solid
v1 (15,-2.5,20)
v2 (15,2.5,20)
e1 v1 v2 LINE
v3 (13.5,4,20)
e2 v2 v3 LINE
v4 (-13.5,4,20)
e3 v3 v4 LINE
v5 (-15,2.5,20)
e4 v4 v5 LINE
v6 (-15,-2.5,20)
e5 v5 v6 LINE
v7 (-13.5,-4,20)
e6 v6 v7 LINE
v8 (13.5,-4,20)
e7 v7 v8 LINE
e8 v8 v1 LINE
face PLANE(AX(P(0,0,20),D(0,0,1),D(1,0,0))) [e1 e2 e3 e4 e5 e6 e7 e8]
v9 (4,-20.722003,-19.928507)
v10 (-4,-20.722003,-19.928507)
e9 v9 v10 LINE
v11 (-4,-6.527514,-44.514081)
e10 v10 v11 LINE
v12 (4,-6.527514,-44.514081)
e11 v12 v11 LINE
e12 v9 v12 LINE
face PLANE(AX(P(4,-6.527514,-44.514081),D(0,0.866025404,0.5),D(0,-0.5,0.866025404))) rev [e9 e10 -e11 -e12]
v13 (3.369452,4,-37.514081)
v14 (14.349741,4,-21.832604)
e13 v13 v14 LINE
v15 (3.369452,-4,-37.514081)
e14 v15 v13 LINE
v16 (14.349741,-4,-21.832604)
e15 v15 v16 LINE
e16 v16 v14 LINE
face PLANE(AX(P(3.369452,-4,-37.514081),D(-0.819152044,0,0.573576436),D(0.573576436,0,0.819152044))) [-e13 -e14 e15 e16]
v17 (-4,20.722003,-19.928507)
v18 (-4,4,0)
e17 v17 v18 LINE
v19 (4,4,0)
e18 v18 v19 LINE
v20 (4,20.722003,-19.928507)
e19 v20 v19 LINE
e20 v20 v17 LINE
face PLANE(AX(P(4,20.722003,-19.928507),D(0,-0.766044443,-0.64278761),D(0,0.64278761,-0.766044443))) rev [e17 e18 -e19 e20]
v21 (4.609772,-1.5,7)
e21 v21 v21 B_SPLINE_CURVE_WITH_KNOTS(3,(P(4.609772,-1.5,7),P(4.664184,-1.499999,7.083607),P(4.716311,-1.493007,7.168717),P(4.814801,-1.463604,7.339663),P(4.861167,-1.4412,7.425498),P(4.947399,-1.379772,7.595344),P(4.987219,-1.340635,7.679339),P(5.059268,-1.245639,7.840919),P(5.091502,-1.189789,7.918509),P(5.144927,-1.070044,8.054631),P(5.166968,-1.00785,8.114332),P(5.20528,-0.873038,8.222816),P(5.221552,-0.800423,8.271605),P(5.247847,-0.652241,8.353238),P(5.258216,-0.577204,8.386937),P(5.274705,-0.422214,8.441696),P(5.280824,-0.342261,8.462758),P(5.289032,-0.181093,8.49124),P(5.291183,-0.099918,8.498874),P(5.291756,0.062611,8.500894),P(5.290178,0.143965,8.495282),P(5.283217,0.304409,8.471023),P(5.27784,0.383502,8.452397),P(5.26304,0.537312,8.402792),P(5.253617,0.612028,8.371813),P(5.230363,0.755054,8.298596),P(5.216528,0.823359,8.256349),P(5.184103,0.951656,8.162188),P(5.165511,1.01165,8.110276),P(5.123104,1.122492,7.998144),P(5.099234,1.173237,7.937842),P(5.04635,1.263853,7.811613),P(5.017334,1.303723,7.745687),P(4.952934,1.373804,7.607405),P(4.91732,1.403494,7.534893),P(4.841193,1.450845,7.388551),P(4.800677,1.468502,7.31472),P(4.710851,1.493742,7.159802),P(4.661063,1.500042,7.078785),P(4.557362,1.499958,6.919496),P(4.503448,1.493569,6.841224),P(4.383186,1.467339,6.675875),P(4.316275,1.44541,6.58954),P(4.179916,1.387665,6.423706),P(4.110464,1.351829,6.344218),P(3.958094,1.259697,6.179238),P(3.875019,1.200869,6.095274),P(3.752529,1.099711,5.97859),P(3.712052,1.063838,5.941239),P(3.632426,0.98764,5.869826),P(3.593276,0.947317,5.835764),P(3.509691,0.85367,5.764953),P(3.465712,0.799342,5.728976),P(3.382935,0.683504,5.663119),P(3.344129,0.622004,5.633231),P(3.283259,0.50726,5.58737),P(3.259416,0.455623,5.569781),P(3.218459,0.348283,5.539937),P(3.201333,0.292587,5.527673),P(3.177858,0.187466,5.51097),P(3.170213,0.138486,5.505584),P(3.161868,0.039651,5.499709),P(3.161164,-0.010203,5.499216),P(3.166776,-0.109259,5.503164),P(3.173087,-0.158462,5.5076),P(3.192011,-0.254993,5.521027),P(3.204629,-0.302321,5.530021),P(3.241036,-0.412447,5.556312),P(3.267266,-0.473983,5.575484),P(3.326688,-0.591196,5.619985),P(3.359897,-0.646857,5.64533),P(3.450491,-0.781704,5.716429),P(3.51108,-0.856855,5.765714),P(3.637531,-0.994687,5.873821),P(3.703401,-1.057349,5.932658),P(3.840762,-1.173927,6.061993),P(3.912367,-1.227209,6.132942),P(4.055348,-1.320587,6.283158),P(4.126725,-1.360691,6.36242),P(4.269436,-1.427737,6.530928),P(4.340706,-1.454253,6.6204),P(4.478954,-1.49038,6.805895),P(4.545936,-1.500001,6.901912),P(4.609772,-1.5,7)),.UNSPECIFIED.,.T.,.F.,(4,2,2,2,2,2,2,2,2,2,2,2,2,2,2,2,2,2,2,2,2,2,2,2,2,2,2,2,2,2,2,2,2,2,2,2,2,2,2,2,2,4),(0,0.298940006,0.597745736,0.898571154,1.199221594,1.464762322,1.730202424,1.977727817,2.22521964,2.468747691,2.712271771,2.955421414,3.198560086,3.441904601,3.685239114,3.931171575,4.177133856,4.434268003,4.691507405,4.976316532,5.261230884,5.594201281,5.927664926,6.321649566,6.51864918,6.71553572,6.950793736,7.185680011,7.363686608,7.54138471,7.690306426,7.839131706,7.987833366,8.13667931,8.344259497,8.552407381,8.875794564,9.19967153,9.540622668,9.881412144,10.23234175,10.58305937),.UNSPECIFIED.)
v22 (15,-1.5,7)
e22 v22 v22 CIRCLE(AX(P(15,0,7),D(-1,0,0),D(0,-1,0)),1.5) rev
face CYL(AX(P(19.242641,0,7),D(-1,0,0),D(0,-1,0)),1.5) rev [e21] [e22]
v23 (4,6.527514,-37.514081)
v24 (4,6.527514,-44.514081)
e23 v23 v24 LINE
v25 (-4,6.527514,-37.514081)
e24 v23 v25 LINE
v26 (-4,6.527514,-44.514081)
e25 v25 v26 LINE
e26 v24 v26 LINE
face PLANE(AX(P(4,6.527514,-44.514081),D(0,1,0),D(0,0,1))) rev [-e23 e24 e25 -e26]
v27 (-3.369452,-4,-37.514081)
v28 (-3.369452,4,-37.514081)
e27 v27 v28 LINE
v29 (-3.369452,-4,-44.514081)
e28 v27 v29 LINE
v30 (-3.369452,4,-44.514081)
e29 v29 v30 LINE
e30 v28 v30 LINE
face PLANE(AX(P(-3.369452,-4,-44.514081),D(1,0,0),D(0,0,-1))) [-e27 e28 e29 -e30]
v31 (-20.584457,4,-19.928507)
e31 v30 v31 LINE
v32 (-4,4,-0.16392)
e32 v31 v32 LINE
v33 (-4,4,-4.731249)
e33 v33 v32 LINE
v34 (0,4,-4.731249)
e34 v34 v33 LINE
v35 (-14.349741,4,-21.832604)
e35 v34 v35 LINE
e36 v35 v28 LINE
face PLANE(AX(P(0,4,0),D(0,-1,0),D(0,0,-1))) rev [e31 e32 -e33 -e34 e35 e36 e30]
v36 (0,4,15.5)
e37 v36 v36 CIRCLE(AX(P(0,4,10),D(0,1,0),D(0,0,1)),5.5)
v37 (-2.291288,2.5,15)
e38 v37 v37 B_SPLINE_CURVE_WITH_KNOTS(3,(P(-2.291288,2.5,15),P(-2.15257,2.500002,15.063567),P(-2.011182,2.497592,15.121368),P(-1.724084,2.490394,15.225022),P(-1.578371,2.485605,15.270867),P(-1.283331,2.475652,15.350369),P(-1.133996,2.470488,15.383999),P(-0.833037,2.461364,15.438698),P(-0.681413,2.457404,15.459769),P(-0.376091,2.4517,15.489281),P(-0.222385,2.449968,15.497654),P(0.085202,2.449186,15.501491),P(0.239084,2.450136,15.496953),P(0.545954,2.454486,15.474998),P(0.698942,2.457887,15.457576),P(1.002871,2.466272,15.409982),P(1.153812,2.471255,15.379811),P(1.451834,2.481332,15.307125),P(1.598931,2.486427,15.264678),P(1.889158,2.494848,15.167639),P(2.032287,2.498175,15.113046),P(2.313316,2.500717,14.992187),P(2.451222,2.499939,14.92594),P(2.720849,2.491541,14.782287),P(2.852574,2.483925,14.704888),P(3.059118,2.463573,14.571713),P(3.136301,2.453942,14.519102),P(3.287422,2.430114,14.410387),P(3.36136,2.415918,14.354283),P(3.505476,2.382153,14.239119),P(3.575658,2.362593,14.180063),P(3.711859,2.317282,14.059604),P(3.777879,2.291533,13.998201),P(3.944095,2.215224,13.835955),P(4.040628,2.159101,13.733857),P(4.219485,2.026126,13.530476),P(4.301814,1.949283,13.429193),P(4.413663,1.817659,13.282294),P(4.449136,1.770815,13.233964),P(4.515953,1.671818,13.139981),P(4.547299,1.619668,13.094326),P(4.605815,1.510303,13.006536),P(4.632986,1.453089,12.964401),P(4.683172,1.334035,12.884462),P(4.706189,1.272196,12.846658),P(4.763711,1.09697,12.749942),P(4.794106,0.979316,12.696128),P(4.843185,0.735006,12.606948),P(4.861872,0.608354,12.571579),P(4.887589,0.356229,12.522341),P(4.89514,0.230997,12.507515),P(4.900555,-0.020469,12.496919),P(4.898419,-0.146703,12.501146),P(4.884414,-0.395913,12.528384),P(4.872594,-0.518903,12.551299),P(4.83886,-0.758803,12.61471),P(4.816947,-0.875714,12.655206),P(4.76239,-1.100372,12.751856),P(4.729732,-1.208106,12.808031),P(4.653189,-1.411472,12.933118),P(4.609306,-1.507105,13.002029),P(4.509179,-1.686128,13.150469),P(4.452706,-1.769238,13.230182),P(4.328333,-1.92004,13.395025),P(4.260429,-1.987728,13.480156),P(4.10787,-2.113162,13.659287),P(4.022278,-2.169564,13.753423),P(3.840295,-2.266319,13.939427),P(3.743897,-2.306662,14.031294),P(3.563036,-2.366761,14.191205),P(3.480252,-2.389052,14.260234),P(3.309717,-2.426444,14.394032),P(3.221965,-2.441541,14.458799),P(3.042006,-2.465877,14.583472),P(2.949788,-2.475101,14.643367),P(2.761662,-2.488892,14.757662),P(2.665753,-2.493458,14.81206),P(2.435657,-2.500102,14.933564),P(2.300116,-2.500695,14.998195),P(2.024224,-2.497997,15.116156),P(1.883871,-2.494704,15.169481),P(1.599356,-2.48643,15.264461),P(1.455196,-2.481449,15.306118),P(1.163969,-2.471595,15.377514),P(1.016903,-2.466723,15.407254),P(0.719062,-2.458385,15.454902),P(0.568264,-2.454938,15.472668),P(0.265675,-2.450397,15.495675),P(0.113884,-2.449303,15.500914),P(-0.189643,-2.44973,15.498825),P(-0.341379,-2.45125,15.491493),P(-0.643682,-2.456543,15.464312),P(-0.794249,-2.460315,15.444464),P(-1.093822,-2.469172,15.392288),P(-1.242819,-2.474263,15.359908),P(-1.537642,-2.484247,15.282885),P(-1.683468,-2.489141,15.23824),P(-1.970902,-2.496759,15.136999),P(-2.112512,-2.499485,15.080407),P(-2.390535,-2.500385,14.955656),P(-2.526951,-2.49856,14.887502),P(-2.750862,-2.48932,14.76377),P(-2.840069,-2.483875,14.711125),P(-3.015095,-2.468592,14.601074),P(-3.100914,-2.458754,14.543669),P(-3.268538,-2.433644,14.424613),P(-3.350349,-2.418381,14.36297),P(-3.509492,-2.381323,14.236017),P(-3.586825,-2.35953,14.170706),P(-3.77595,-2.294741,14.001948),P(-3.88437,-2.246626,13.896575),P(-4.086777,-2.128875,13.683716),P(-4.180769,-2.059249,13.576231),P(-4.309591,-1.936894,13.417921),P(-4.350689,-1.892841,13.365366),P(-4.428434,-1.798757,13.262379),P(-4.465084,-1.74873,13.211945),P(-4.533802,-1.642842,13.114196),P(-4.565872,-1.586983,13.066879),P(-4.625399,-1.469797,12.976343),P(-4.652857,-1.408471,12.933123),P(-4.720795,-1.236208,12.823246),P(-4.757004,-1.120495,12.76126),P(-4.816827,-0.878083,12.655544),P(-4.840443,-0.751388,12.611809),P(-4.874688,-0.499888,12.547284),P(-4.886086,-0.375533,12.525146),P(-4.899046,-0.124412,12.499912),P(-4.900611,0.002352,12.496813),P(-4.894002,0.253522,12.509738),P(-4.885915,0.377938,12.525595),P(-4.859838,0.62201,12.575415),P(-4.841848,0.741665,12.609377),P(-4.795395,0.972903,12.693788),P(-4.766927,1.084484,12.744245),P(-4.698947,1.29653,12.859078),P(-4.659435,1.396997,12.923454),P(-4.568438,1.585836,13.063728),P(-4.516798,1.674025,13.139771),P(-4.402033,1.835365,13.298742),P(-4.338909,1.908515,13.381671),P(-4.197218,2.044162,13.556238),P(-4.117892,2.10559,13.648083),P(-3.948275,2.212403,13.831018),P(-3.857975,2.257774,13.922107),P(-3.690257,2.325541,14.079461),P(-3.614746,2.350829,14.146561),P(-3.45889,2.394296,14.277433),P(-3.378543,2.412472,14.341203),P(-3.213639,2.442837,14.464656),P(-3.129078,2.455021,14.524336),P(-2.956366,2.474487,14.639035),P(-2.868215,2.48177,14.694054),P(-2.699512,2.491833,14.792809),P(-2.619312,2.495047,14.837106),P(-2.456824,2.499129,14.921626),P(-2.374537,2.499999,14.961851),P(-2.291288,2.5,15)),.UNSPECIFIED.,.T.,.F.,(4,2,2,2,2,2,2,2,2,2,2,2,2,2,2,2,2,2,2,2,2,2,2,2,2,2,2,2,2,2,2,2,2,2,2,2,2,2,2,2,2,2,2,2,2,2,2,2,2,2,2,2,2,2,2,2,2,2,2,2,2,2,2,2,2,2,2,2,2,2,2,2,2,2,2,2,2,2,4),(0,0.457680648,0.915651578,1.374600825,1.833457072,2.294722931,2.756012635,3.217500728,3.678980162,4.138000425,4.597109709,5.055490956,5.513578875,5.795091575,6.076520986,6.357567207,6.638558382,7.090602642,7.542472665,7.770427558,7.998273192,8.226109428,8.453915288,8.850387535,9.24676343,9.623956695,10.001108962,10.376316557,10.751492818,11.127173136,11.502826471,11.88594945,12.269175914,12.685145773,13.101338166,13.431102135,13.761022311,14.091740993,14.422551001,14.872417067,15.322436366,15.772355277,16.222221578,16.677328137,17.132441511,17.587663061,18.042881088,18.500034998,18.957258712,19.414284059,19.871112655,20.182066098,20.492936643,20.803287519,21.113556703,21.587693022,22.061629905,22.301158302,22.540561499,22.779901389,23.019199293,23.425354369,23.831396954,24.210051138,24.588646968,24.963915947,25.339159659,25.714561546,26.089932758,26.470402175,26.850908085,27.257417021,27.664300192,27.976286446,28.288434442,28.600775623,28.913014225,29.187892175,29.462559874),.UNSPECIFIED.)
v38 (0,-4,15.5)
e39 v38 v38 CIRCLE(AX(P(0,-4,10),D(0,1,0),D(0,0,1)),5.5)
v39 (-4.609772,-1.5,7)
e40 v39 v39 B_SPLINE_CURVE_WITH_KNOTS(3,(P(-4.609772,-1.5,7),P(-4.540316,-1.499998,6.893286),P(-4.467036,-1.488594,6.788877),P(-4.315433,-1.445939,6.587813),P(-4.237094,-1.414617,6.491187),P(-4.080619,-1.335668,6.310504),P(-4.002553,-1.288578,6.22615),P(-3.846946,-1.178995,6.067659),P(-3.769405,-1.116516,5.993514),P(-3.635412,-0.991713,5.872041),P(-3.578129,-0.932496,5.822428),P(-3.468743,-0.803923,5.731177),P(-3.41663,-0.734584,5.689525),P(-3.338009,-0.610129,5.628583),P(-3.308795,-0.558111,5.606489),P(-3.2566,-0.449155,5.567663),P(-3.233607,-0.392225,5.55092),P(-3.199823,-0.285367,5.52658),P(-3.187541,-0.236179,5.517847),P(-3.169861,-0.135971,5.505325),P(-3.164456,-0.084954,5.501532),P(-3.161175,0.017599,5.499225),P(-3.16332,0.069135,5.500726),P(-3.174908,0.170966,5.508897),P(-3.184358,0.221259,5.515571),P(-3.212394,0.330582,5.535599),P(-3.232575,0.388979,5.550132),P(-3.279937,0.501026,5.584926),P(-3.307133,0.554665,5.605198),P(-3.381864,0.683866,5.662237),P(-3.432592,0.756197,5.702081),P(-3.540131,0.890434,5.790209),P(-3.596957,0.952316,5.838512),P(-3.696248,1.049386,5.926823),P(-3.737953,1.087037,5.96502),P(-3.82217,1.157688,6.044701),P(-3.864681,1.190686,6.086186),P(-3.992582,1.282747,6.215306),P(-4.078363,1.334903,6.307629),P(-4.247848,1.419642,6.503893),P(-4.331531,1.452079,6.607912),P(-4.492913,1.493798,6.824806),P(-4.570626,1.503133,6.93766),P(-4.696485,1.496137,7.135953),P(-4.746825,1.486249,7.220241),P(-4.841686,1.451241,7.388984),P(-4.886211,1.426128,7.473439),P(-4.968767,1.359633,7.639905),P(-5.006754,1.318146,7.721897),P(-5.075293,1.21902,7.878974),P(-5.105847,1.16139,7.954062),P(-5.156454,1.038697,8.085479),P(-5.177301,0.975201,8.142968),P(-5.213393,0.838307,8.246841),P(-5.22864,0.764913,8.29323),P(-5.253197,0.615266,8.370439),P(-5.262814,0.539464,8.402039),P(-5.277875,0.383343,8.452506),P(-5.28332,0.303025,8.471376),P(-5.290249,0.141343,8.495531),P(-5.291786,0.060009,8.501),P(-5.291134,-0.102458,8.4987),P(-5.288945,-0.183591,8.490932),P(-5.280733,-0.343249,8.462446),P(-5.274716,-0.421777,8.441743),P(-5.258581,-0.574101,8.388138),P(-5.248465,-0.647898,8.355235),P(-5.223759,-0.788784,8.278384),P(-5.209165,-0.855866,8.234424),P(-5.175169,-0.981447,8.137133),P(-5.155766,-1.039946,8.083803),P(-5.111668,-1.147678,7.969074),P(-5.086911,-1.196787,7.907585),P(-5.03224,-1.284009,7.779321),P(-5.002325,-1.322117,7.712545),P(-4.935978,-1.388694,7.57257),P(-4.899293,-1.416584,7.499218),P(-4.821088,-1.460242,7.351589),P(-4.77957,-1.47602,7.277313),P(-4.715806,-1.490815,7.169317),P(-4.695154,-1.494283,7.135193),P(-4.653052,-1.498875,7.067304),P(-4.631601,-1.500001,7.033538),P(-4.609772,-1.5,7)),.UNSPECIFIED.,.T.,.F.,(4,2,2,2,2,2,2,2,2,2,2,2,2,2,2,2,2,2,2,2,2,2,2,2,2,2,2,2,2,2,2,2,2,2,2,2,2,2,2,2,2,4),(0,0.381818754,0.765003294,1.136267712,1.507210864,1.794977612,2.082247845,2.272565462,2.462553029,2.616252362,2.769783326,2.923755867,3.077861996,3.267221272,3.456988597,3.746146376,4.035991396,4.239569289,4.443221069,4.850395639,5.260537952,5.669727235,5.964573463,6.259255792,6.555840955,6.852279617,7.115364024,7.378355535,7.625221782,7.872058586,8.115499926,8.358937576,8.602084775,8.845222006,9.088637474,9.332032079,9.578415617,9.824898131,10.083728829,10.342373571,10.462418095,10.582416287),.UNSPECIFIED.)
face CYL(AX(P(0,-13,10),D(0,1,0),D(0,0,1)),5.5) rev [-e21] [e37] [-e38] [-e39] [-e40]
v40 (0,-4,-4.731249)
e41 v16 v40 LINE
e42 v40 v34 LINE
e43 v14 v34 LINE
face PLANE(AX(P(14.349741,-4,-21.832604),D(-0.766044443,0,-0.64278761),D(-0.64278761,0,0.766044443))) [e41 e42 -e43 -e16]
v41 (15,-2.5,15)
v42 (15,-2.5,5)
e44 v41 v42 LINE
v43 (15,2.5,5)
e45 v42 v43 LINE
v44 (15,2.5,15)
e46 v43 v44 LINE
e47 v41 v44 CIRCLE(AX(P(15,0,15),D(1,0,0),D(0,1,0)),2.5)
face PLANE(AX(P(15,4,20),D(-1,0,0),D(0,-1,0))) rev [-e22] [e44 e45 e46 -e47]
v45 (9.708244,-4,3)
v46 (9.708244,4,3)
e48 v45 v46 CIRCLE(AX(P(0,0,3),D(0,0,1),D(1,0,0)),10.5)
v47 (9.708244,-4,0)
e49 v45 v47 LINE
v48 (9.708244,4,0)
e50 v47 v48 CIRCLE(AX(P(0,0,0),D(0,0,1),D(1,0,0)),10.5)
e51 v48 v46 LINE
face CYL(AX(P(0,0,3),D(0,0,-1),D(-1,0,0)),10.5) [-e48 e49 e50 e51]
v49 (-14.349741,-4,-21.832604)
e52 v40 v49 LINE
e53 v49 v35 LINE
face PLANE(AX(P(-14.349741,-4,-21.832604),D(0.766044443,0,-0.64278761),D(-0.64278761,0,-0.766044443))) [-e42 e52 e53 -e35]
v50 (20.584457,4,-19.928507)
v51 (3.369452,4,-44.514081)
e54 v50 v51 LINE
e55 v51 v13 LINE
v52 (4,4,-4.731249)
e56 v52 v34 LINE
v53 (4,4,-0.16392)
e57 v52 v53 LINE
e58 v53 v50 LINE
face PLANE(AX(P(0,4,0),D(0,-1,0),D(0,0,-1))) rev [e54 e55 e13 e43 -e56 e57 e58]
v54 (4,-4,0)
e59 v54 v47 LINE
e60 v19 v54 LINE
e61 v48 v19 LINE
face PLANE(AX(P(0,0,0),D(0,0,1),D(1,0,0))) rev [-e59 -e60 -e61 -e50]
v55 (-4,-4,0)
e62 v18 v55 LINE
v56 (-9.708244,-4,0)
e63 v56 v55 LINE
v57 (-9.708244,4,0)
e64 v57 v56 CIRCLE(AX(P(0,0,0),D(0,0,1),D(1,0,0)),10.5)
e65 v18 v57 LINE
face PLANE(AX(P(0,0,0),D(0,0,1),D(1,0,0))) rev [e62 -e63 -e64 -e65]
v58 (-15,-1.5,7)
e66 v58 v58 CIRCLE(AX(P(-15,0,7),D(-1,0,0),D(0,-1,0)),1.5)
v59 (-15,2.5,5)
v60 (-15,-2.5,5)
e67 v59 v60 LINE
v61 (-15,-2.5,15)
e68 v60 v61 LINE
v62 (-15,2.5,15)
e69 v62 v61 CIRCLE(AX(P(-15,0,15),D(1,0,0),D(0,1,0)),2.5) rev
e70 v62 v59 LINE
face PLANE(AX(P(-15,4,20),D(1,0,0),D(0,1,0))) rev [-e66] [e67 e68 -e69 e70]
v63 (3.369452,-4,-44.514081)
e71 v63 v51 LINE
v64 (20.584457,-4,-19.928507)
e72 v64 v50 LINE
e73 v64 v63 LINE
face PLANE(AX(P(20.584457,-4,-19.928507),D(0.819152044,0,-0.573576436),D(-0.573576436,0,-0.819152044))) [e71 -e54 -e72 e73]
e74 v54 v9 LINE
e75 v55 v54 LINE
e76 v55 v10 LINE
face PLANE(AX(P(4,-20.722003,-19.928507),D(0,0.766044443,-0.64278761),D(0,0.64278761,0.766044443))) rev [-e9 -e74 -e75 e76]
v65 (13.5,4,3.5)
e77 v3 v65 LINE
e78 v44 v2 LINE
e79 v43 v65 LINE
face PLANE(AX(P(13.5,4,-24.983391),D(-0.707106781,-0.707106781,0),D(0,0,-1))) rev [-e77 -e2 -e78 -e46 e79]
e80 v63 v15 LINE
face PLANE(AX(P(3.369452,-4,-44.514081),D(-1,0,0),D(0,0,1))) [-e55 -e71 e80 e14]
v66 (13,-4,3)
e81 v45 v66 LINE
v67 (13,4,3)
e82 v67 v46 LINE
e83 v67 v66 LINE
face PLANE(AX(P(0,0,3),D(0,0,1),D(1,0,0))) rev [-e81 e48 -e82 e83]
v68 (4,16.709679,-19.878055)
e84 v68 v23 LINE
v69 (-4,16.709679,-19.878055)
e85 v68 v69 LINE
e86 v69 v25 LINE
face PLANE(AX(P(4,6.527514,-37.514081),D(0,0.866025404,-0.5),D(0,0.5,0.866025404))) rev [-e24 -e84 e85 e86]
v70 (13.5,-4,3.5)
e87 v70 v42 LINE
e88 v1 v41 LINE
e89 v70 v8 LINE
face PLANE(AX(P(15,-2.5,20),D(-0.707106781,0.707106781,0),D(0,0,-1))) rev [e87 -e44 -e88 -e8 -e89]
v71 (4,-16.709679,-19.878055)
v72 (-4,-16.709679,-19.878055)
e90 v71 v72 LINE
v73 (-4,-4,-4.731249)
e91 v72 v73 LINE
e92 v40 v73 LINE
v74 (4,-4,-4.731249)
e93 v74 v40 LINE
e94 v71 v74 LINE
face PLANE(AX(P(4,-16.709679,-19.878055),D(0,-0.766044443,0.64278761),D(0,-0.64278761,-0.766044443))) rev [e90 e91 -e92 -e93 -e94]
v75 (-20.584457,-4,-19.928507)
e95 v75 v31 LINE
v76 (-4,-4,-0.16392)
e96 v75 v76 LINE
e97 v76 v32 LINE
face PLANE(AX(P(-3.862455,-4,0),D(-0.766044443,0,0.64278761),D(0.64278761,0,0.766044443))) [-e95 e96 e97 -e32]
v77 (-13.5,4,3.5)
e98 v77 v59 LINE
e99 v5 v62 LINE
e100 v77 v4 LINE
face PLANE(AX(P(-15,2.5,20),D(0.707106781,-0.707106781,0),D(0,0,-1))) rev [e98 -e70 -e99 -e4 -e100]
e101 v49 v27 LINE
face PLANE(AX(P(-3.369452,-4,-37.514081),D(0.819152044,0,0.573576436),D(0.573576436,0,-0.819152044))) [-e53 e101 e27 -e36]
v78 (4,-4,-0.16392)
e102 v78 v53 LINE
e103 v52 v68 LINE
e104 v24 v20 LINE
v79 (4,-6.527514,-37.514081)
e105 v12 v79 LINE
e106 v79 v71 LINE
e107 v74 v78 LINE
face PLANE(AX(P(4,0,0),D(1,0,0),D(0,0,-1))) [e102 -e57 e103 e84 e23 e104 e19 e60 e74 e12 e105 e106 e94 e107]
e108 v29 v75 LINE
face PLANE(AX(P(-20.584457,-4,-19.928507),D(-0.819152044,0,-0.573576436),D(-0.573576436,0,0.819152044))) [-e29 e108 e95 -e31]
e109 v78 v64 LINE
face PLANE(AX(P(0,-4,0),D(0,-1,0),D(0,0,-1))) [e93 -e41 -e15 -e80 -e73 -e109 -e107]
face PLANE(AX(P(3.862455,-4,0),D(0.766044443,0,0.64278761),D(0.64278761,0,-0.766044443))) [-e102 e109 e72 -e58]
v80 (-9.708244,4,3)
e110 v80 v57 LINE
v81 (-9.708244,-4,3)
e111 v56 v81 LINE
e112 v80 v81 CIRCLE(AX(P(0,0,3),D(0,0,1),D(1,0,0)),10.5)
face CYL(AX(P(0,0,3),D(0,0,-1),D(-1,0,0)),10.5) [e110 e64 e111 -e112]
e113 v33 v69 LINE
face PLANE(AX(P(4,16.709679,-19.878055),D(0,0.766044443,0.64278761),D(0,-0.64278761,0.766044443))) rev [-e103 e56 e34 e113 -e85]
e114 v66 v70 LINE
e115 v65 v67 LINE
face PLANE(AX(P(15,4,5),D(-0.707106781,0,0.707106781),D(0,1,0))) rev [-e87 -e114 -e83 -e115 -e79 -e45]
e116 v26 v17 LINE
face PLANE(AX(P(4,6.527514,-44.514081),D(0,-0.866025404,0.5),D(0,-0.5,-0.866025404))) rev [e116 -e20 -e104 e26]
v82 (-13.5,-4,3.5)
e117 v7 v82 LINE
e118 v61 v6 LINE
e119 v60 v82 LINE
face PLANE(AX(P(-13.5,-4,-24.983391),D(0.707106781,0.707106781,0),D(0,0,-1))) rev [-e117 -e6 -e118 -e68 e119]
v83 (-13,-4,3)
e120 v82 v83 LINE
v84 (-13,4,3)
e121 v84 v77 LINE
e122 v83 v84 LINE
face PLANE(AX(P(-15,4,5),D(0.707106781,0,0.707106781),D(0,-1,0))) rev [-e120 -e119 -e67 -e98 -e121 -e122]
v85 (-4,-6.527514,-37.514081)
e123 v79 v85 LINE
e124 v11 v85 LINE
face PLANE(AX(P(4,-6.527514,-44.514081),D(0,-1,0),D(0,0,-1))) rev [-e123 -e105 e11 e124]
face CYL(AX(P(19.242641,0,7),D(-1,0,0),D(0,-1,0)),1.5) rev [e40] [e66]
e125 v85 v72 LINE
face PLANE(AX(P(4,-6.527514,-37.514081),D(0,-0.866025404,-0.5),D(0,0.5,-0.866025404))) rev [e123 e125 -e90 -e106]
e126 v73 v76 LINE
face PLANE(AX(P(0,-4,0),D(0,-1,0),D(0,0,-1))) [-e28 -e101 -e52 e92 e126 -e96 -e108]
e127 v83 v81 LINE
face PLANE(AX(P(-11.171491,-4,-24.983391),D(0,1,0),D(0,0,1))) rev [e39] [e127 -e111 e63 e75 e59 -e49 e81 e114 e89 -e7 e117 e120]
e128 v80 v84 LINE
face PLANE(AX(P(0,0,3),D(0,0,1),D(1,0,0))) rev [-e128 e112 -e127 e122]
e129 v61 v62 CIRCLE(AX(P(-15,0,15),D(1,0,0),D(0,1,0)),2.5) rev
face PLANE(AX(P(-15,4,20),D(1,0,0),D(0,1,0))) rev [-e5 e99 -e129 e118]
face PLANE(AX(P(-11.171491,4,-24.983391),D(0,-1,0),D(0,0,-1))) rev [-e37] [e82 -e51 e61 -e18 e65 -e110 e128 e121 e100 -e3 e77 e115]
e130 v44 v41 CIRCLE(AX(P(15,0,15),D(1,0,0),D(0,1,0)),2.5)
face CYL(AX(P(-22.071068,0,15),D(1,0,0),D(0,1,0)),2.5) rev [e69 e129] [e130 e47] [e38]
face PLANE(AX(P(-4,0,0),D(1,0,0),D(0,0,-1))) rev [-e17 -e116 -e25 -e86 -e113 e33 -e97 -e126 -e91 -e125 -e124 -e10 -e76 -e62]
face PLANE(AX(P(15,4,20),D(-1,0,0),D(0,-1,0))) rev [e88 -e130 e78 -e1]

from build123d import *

# Parameters (mm, degrees)
IZIM2_R                          = 10.5
Y_KSEKLIK_EKSTR_ZYON1_DEPTH      = 3
Y_KSEKLIK_EKSTR_ZYON3_DEPTH      = 4
Y_KSEKLIK_EKSTR_ZYON3_DEPTH_BACK = 4
Y_KSEKLIK_EKSTR_ZYON6_DEPTH      = 4
Y_KSEKLIK_EKSTR_ZYON6_DEPTH_BACK = 4
IZIM5_W                          = 23.418755165
IZIM5_H                          = 7.378370442
IZIM5_H_2                        = 8.702399003
KES_EKSTR_ZYON1_DEPTH            = 3
IZIM6_W                          = 30
IZIM6_H                          = 8
Y_KSEKLIK_EKSTR_ZYON7_DEPTH      = 17
IZIM7_R                          = 2.5
KES_EKSTR_ZYON2_DEPTH            = 30
IZIM8_R                          = 1.5
KES_EKSTR_ZYON3_DEPTH            = 30
PAH1_SIZE                        = 1.5
PAH2_SIZE                        = 2
IZIM9_R                          = 5.5
KES_EKSTR_ZYON4_DEPTH            = 17


with BuildPart() as part:
    # Çizim2 → Yükseklik-Ekstrüzyon1 (new body)
    with BuildSketch(Plane.XY):
        Circle(IZIM2_R)
    extrude(amount=Y_KSEKLIK_EKSTR_ZYON1_DEPTH)

    # Çizim3 → Yükseklik-Ekstrüzyon3 (add, two sides: drawn at the far end of the back side and taken through both)
    with BuildSketch(Plane(origin=(0, 0, 0), x_dir=(1, 0, 0), z_dir=(0, 1, 0)).offset(-Y_KSEKLIK_EKSTR_ZYON3_DEPTH_BACK)):
        Polygon((-14.349740813, 21.832604096), (0, 4.731248928), (14.349740813, 21.832604096), (3.3694522, 37.514081392), (3.3694522, 44.514081392), (20.58445702, 19.928506573), (3.862454505, 0), (-3.862454505, 0), (-20.58445702, 19.928506573), (-3.3694522, 44.514081392), (-3.3694522, 37.514081392), align=None)
    extrude(amount=Y_KSEKLIK_EKSTR_ZYON3_DEPTH + Y_KSEKLIK_EKSTR_ZYON3_DEPTH_BACK)

    # Çizim4 → Yükseklik-Ekstrüzyon6 (add, two sides: drawn at the far end of the back side and taken through both)
    with BuildSketch(Plane(origin=(0, 0, 0), x_dir=(0, 0, -1), z_dir=(1, 0, 0)).offset(-Y_KSEKLIK_EKSTR_ZYON6_DEPTH_BACK)):
        Polygon((44.514081392, 6.527514275), (37.514081392, 6.527514275), (19.878054627, 16.709679075), (4.731248928, 4), (4.731248928, -4), (19.878054627, -16.709679075), (37.514081392, -6.527514275), (44.514081392, -6.527514275), (19.928506573, -20.722002515), (0, -4), (0, 4), (19.928506573, 20.722002515), align=None)
    extrude(amount=Y_KSEKLIK_EKSTR_ZYON6_DEPTH + Y_KSEKLIK_EKSTR_ZYON6_DEPTH_BACK)

    # Çizim5 → Kes-Ekstrüzyon1 (cut)
    with BuildSketch(Plane.XY.offset(3)):
        with Locations((0.537886602, 7.689185221)):
            Rectangle(IZIM5_W, IZIM5_H)
        with Locations((0.537886602, -8.351199502)):
            Rectangle(IZIM5_W, IZIM5_H_2)
    extrude(amount=-KES_EKSTR_ZYON1_DEPTH, mode=Mode.SUBTRACT)

    # Çizim6 → Yükseklik-Ekstrüzyon7 (add)
    with BuildSketch(Plane.XY.offset(3)):
        Rectangle(IZIM6_W, IZIM6_H)
    extrude(amount=Y_KSEKLIK_EKSTR_ZYON7_DEPTH)

    # Çizim7 → Kes-Ekstrüzyon2 (cut)
    with BuildSketch(Plane(origin=(15, 0, 0), x_dir=(0, 0, -1), z_dir=(1, 0, 0))):
        with Locations(Location((-15, 0, 0), (0, 0, 90))):
            Circle(IZIM7_R)
    extrude(amount=-KES_EKSTR_ZYON2_DEPTH, mode=Mode.SUBTRACT)

    # Çizim8 → Kes-Ekstrüzyon3 (cut)
    with BuildSketch(Plane.ZY.offset(15)):
        with Locations(Location((7, 0, 0), (0, 0, 270))):
            Circle(IZIM8_R)
    extrude(amount=-KES_EKSTR_ZYON3_DEPTH, mode=Mode.SUBTRACT)

    # Pah1
    pah1_edges = [part.edges().sort_by_distance(p)[0] for p in [
        (15, -4, 11.5),
        (15, 4, 11.5),
        (-15, -4, 11.5),
        (-15, 4, 11.5),
    ]]
    chamfer(pah1_edges, length=PAH1_SIZE - 0.0001)  # a hair under: the kernel refuses the full size

    # Pah2
    pah2_edges = [part.edges().sort_by_distance(p)[0] for p in [
        (15, 0, 3),
        (-15, 0, 3),
    ]]
    chamfer(pah2_edges, length=PAH2_SIZE)

    # Çizim9 → Kes-Ekstrüzyon4 (cut)
    with BuildSketch(Plane(origin=(0, 4, 0), x_dir=(1, 0, 0), z_dir=(0, 1, 0))):
        with Locations(Location((0, -10, 0), (0, 0, 270))):
            Circle(IZIM9_R)
    extrude(amount=-KES_EKSTR_ZYON4_DEPTH, mode=Mode.SUBTRACT)


solid = part.part
